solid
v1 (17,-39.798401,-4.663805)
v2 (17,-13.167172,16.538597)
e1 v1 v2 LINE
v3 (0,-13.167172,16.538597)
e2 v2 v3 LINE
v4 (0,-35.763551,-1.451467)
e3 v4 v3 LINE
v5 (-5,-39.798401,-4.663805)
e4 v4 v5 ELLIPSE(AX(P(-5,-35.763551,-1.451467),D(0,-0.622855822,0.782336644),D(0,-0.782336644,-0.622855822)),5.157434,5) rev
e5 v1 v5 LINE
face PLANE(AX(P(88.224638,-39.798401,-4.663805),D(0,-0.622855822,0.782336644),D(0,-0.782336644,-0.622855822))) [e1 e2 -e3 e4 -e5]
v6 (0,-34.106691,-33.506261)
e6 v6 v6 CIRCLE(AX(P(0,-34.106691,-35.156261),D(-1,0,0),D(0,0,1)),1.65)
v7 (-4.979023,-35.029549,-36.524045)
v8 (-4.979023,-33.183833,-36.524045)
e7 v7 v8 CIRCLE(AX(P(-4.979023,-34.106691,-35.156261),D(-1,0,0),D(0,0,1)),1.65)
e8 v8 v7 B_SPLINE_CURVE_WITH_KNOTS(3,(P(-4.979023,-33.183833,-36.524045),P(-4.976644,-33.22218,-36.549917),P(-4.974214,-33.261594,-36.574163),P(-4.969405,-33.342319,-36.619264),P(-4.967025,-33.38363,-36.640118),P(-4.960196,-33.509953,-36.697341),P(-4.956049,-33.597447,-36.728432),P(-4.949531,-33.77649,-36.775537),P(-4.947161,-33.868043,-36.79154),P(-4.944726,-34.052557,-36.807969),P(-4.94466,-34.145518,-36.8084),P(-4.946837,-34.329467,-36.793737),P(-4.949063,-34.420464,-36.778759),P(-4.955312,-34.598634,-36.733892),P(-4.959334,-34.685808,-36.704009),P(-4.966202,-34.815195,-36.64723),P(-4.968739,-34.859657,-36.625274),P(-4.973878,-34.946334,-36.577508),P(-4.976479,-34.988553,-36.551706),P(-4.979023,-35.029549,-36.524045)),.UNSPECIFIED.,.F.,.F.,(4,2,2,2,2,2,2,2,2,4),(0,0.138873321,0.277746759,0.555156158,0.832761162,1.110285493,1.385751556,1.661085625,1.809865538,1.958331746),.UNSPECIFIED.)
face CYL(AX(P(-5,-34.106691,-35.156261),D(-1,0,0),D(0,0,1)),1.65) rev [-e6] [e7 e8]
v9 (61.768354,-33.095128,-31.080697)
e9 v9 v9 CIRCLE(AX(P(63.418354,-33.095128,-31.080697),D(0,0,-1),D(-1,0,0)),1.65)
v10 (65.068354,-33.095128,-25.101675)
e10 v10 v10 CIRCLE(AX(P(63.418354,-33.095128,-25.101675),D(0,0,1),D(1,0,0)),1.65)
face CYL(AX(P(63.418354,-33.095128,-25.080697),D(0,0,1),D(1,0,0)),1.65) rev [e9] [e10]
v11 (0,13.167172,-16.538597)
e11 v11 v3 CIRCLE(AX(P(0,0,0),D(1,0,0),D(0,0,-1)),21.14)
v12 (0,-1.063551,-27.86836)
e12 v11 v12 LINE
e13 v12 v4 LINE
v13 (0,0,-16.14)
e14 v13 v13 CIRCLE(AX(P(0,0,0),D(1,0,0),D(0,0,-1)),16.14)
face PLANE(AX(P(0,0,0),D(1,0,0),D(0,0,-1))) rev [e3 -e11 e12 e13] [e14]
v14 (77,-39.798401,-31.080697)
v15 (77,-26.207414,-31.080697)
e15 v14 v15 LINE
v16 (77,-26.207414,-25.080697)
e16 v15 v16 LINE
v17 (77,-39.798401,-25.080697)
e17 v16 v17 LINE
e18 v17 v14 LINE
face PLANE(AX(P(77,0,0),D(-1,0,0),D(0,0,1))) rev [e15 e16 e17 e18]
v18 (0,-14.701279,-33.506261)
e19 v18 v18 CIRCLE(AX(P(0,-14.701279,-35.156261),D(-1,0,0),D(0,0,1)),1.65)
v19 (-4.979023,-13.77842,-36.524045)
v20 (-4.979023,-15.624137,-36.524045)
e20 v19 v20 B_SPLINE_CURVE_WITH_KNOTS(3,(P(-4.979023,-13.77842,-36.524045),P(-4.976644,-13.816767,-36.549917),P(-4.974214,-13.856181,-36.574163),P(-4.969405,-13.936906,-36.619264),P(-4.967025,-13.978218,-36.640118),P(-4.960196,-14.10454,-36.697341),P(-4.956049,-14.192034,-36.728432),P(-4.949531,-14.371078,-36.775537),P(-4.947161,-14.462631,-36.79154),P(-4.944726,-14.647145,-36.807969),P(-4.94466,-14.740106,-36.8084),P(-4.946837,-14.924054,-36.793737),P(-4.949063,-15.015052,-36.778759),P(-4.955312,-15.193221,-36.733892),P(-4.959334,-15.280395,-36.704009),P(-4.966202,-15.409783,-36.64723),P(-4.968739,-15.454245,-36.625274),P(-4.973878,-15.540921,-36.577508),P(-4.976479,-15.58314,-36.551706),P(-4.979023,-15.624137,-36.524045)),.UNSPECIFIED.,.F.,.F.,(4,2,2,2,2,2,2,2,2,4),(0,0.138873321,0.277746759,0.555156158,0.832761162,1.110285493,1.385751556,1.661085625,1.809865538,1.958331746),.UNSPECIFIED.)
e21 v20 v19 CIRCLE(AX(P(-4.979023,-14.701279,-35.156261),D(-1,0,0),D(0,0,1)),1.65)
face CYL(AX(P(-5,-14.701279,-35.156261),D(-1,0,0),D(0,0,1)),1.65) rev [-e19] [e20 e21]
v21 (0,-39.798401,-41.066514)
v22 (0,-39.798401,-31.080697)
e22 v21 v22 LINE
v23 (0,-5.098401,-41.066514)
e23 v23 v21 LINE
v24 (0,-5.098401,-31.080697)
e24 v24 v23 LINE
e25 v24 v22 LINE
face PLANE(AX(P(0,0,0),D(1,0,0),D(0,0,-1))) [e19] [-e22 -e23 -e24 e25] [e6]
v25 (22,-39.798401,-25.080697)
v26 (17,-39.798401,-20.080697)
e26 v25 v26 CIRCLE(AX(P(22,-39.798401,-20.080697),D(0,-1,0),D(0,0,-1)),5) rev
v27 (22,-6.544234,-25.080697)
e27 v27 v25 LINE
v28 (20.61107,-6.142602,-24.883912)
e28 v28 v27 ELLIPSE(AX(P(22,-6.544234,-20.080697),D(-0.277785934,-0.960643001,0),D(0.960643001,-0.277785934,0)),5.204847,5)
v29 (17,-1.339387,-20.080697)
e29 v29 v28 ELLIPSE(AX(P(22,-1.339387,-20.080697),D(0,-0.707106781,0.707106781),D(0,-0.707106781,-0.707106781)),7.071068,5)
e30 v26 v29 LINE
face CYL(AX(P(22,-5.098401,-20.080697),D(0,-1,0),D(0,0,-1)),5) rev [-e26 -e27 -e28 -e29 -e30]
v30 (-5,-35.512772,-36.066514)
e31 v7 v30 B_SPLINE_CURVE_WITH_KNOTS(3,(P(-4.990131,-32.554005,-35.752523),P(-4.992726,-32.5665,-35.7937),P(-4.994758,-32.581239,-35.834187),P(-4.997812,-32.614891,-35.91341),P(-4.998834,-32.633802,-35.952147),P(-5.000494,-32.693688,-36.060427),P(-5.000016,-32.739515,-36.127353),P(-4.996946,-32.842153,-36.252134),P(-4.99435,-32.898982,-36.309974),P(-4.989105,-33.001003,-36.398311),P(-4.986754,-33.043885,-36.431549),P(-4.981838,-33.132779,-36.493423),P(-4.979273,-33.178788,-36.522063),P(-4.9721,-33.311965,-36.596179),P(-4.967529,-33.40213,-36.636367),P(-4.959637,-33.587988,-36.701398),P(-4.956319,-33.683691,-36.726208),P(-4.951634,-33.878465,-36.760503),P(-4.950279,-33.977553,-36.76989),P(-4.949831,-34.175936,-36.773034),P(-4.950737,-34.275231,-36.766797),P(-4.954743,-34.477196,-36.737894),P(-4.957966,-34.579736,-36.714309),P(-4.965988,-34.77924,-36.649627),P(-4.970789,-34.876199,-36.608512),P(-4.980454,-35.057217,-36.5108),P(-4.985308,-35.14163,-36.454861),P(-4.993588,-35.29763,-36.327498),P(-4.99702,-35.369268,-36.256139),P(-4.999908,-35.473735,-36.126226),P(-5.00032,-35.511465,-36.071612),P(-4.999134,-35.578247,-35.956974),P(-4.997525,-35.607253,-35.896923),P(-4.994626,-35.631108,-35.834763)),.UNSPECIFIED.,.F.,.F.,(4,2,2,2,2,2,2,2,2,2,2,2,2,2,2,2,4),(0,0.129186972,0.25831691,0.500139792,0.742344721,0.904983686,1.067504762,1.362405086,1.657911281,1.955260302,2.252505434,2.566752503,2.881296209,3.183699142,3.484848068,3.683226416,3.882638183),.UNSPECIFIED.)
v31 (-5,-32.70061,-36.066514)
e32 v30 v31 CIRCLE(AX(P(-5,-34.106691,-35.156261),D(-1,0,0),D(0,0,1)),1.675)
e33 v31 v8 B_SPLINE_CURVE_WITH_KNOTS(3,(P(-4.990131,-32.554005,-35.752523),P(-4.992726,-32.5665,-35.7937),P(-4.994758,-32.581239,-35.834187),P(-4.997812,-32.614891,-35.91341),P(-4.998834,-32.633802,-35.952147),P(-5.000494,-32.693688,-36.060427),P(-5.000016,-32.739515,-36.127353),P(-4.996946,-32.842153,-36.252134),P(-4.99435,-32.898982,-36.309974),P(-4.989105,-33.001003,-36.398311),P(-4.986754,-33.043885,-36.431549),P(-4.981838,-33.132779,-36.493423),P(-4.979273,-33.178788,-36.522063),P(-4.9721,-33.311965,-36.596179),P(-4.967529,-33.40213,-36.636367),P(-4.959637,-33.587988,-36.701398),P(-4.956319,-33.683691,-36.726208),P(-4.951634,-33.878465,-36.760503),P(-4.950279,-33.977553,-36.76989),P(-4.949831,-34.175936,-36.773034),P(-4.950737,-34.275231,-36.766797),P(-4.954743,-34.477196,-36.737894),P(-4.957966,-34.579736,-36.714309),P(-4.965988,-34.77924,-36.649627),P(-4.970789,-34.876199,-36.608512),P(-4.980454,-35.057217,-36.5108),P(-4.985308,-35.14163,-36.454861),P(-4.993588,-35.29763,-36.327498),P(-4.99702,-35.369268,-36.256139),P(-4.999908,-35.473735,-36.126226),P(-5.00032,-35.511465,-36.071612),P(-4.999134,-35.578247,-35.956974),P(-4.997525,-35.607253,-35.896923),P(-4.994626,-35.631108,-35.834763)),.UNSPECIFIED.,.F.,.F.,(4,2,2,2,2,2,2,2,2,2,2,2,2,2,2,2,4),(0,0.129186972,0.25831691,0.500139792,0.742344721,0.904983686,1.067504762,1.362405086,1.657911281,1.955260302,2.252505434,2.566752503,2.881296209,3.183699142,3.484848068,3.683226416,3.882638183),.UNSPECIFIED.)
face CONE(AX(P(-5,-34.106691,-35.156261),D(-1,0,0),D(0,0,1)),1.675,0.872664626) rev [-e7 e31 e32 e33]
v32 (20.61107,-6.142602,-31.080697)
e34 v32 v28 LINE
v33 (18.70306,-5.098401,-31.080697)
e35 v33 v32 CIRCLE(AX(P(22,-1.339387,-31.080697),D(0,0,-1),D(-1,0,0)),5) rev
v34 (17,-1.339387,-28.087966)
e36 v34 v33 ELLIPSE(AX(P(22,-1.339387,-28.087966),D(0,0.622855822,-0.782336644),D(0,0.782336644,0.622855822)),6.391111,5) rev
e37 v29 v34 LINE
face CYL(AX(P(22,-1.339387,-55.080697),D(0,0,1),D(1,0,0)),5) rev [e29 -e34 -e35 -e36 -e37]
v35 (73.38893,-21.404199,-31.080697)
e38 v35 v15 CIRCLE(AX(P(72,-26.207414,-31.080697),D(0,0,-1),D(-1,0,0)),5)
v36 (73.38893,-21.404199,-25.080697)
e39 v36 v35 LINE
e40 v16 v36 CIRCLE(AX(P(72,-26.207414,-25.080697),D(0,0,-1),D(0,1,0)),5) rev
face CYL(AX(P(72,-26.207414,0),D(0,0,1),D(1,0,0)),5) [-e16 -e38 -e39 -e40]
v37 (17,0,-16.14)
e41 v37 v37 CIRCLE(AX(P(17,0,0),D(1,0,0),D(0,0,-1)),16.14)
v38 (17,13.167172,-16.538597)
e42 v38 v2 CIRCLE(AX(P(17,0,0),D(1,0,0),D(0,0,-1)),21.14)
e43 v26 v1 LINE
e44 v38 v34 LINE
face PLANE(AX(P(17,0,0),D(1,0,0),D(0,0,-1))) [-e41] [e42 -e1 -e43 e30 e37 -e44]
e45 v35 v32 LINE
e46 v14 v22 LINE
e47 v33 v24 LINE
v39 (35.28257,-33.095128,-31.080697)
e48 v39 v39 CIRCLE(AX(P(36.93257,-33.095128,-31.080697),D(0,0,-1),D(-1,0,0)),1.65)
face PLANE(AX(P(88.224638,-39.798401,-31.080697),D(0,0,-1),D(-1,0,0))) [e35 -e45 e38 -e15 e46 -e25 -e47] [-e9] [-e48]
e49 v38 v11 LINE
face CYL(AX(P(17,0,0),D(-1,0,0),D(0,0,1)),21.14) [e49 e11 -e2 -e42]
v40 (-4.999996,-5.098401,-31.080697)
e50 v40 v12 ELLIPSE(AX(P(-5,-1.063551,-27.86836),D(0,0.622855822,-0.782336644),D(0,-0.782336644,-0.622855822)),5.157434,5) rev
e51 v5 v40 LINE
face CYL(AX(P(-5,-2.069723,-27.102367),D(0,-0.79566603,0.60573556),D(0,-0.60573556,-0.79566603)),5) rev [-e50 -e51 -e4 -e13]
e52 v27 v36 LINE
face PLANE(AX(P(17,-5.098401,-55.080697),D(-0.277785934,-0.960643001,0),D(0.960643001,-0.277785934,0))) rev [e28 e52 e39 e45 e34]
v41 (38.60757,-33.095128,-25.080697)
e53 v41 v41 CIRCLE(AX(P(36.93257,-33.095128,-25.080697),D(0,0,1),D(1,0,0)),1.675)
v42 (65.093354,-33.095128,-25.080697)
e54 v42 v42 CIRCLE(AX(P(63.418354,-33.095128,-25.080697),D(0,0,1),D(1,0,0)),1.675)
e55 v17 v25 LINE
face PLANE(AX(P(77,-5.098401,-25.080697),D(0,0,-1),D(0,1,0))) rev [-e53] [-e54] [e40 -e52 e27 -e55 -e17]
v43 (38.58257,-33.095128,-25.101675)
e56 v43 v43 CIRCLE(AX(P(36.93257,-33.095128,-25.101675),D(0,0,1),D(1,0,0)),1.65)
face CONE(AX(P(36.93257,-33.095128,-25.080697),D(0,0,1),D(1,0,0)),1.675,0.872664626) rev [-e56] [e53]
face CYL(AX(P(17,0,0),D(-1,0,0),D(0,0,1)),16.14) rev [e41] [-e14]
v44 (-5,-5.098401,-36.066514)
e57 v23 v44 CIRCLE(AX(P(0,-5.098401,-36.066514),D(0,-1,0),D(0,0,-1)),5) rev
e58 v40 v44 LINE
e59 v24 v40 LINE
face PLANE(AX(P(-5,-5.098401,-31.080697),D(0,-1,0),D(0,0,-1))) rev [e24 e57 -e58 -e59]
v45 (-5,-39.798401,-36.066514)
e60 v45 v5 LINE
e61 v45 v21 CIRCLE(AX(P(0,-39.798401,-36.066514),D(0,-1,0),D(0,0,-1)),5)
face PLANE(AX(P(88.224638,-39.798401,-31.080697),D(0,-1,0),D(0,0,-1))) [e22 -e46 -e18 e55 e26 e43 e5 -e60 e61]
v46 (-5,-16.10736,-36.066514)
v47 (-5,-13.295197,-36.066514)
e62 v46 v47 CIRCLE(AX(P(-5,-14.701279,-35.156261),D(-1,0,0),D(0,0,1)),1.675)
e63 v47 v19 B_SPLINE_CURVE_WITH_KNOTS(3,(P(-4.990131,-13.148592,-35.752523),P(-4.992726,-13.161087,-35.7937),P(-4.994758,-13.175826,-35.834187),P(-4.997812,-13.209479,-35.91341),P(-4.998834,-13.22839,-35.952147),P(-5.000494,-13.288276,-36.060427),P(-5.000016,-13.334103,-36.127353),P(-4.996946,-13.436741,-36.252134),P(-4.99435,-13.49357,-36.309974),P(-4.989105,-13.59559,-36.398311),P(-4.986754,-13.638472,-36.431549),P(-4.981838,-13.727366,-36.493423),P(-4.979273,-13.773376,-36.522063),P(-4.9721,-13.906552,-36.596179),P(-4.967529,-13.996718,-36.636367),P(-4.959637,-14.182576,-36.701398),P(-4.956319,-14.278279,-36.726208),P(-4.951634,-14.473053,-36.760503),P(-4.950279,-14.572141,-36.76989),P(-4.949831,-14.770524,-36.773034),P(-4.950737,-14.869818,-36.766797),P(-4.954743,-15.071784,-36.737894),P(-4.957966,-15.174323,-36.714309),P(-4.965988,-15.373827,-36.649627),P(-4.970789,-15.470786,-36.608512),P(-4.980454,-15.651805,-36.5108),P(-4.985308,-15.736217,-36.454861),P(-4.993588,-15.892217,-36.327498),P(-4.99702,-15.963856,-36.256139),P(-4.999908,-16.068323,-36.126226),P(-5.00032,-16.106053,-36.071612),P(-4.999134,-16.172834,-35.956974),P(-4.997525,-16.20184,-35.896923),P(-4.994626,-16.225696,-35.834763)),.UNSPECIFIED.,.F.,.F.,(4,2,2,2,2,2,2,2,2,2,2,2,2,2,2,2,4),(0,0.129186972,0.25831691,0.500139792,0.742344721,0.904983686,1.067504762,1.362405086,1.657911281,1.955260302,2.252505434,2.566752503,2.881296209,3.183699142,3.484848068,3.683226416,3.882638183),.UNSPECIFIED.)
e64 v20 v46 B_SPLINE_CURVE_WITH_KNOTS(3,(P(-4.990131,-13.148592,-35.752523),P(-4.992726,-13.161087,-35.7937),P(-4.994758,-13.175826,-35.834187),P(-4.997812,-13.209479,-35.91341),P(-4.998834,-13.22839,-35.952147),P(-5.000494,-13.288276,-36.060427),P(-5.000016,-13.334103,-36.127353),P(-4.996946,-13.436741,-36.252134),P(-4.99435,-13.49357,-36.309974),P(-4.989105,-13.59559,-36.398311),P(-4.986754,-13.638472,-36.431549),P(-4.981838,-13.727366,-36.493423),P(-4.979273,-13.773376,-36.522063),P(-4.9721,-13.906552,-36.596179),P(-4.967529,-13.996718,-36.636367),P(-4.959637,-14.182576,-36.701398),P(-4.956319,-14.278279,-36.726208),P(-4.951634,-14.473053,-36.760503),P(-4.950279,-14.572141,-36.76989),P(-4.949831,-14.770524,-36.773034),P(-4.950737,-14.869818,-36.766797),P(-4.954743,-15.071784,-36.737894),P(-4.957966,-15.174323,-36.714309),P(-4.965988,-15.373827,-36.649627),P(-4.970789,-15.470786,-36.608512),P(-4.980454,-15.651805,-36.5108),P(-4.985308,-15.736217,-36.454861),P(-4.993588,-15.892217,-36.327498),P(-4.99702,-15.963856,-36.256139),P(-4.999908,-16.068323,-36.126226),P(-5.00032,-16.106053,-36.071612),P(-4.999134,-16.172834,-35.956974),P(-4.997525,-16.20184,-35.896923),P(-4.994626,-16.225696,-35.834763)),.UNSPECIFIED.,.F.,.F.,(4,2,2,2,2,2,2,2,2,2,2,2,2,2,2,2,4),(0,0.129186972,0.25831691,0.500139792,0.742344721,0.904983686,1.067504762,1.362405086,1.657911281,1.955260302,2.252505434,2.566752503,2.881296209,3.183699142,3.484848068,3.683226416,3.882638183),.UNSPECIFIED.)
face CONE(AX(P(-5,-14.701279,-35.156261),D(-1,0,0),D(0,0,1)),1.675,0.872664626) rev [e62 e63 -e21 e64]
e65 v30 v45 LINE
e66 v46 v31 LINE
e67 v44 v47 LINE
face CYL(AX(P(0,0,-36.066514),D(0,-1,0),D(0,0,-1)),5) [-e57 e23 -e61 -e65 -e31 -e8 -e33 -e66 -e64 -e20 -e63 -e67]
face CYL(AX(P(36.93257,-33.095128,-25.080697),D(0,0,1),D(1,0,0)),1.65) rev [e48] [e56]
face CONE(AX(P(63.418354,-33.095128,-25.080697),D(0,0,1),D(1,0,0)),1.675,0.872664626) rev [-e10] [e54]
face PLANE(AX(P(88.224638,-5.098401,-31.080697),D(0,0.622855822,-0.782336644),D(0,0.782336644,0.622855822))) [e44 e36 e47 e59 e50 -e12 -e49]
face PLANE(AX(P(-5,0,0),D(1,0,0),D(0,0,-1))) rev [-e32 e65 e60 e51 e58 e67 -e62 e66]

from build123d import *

# Parameters (mm, degrees)
SKETCH1_R                             = 21.14
SKETCH1_R_2                           = 16.14
BOSS_EXTRUDE1_DEPTH                   = 17
BOSS_EXTRUDE2_DEPTH                   = 17
SKETCH3_W                             = 6
SKETCH3_H                             = 34.7
BOSS_EXTRUDE3_DEPTH                   = 60
CUT_EXTRUDE1_DEPTH                    = 30
FILLET1_R                             = 5
BOSS_EXTRUDE4_DEPTH                   = 5
FILLET2_R                             = 5
TAP_DRILL_FOR_M4X0_7_TAP1_D           = 3.3
TAP_DRILL_FOR_M4X0_7_TAP1_DEPTH       = 5
TAP_DRILL_FOR_M4X0_7_TAP1_CSINK_D     = 3.35
TAP_DRILL_FOR_M4X0_7_TAP1_CSINK_ANGLE = 100
TAP_DRILL_FOR_M4X0_7_TAP1_TIP         = 0.991420021
TAP_DRILL_FOR_M4X0_7_TAP2_D           = 3.3
TAP_DRILL_FOR_M4X0_7_TAP2_DEPTH       = 7
TAP_DRILL_FOR_M4X0_7_TAP2_CSINK_D     = 3.35
TAP_DRILL_FOR_M4X0_7_TAP2_CSINK_ANGLE = 100
TAP_DRILL_FOR_M4X0_7_TAP2_TIP         = 0.991420021


with BuildPart() as part:
    # Sketch1 → Boss-Extrude1 (new body)
    with BuildSketch(Plane(origin=(0, 0, 0), x_dir=(0, 0, -1), z_dir=(1, 0, 0))):
        Circle(SKETCH1_R)
        Circle(SKETCH1_R_2, mode=Mode.SUBTRACT)
    extrude(amount=BOSS_EXTRUDE1_DEPTH)

    # Sketch2 → Boss-Extrude2 (add)
    with BuildSketch(Plane.ZY):
        with BuildLine():
            Line((-31.080697416, -39.798400642), (-31.080697416, -5.098400642))
            Line((-31.080697416, -5.098400642), (-16.538596663, 13.167172074))
            ThreePointArc((-16.538596663, 13.167172074), (-13.167172074, -16.538596663), (16.538596663, -13.167172074))
            Line((16.538596663, -13.167172074), (-4.663804983, -39.798400642))
            Line((-4.663804983, -39.798400642), (-31.080697416, -39.798400642))
        make_face()
    extrude(amount=-BOSS_EXTRUDE2_DEPTH)

    # Sketch3 → Boss-Extrude3 (add)
    with BuildSketch(Plane(origin=(17, 0, 0), x_dir=(0, 0, -1), z_dir=(1, 0, 0))):
        with Locations((28.080697416, -22.448400642)):
            Rectangle(SKETCH3_W, SKETCH3_H)
    extrude(amount=BOSS_EXTRUDE3_DEPTH)

    # Sketch4 → Cut-Extrude1 (cut)
    with BuildSketch(Plane.XY.offset(-25.080697416)):
        Polygon((17, -5.098400642), (77, -22.448400642), (77, -5.098400642), align=None)
    extrude(amount=-CUT_EXTRUDE1_DEPTH, mode=Mode.SUBTRACT)

    # Fillet1
    fillet1_edges = [part.edges().sort_by_distance(p)[0] for p in [
        (17, -5.098400642, -28.080697416),
        (17, -22.448400642, -25.080697416),
        (77, -22.448400642, -28.080697416),
    ]]
    fillet(fillet1_edges, radius=FILLET1_R)

    # Sketch5 → Boss-Extrude4 (add)
    with BuildSketch(Plane.ZY):
        Polygon((-31.080697416, -5.098400642), (-41.06651396, -5.098400642), (-41.06651396, -39.798400642), (-25.501919328, -39.798400642), (-4.663804983, -39.798400642), align=None)
    extrude(amount=BOSS_EXTRUDE4_DEPTH)

    # Fillet2
    # the kernel refuses this fillet: 5 mm, written as the material it adds along each edge
    with BuildSketch(Plane(origin=(0, -49.744226019, 2.907889517), x_dir=(0, 0.6057355599289151, 0.795666030089009), z_dir=(0, 0.795666030089009, -0.6057355599289151))) as fillet2_piece_1_section:
        with BuildLine():
            CenterArc((FILLET2_R, -FILLET2_R), FILLET2_R, 90, 90)
            Line((0, -FILLET2_R), (0, 0))
            Line((0, 0), (FILLET2_R, 0))
        make_face()
    fillet2_piece_1 = extrude(amount=68.611262374, mode=Mode.PRIVATE)
    fillet2_piece_1 = split(fillet2_piece_1, bisect_by=Plane(origin=(-1.148121472, -8.497406794, -33.786809657), z_dir=(0, -0.6228558218455279, 0.7823366444141115)), keep=Keep.TOP, mode=Mode.PRIVATE)
    fillet2_piece_1 = split(fillet2_piece_1, bisect_by=Plane(origin=(-1.148121472, -34.831750942, -0.709616331), z_dir=(0, 0.6228558218455282, -0.7823366444141113)), keep=Keep.TOP, mode=Mode.PRIVATE)
    fillet2_piece_1 = split(fillet2_piece_1, bisect_by=Plane(origin=(-1.148121472, -39.798400642, -16.823425528), z_dir=(0, 1, 0)), keep=Keep.TOP, mode=Mode.PRIVATE)
    add(fillet2_piece_1)
    # the kernel refuses this fillet: 5 mm, written as the material it takes off along each edge
    with BuildSketch(Plane(origin=(-5, 7.401599358, -41.06651396), x_dir=(0, 0, 1), z_dir=(0, -1, 0))) as fillet2_2_piece_1:
        with BuildLine():
            CenterArc((FILLET2_R, -FILLET2_R), FILLET2_R, 90, 90)
            Line((0, -FILLET2_R), (0, 0))
            Line((0, 0), (FILLET2_R, 0))
        make_face()
    extrude(amount=59.7, mode=Mode.SUBTRACT)

    # Tap Drill for M4x0.7 Tap1
    with Locations(Plane.ZY.offset(5)):
        with Locations((-35.156261267, -14.70127854), (-35.156261267, -34.106690994)):
            CounterSinkHole(TAP_DRILL_FOR_M4X0_7_TAP1_D / 2, TAP_DRILL_FOR_M4X0_7_TAP1_CSINK_D / 2, depth=TAP_DRILL_FOR_M4X0_7_TAP1_DEPTH, counter_sink_angle=TAP_DRILL_FOR_M4X0_7_TAP1_CSINK_ANGLE)
            with Locations((0, 0, -(TAP_DRILL_FOR_M4X0_7_TAP1_DEPTH + TAP_DRILL_FOR_M4X0_7_TAP1_TIP / 2))):  # 118° drill point
                Cone(0, TAP_DRILL_FOR_M4X0_7_TAP1_D / 2, TAP_DRILL_FOR_M4X0_7_TAP1_TIP, mode=Mode.SUBTRACT)

    # Tap Drill for M4x0.7 Tap2
    with Locations(Plane.XY.offset(-25.080697416)):
        with Locations((36.93257039, -33.095127913), (63.418354043, -33.095127913)):
            CounterSinkHole(TAP_DRILL_FOR_M4X0_7_TAP2_D / 2, TAP_DRILL_FOR_M4X0_7_TAP2_CSINK_D / 2, depth=TAP_DRILL_FOR_M4X0_7_TAP2_DEPTH, counter_sink_angle=TAP_DRILL_FOR_M4X0_7_TAP2_CSINK_ANGLE)
            with Locations((0, 0, -(TAP_DRILL_FOR_M4X0_7_TAP2_DEPTH + TAP_DRILL_FOR_M4X0_7_TAP2_TIP / 2))):  # 118° drill point
                Cone(0, TAP_DRILL_FOR_M4X0_7_TAP2_D / 2, TAP_DRILL_FOR_M4X0_7_TAP2_TIP, mode=Mode.SUBTRACT)


solid = part.part
